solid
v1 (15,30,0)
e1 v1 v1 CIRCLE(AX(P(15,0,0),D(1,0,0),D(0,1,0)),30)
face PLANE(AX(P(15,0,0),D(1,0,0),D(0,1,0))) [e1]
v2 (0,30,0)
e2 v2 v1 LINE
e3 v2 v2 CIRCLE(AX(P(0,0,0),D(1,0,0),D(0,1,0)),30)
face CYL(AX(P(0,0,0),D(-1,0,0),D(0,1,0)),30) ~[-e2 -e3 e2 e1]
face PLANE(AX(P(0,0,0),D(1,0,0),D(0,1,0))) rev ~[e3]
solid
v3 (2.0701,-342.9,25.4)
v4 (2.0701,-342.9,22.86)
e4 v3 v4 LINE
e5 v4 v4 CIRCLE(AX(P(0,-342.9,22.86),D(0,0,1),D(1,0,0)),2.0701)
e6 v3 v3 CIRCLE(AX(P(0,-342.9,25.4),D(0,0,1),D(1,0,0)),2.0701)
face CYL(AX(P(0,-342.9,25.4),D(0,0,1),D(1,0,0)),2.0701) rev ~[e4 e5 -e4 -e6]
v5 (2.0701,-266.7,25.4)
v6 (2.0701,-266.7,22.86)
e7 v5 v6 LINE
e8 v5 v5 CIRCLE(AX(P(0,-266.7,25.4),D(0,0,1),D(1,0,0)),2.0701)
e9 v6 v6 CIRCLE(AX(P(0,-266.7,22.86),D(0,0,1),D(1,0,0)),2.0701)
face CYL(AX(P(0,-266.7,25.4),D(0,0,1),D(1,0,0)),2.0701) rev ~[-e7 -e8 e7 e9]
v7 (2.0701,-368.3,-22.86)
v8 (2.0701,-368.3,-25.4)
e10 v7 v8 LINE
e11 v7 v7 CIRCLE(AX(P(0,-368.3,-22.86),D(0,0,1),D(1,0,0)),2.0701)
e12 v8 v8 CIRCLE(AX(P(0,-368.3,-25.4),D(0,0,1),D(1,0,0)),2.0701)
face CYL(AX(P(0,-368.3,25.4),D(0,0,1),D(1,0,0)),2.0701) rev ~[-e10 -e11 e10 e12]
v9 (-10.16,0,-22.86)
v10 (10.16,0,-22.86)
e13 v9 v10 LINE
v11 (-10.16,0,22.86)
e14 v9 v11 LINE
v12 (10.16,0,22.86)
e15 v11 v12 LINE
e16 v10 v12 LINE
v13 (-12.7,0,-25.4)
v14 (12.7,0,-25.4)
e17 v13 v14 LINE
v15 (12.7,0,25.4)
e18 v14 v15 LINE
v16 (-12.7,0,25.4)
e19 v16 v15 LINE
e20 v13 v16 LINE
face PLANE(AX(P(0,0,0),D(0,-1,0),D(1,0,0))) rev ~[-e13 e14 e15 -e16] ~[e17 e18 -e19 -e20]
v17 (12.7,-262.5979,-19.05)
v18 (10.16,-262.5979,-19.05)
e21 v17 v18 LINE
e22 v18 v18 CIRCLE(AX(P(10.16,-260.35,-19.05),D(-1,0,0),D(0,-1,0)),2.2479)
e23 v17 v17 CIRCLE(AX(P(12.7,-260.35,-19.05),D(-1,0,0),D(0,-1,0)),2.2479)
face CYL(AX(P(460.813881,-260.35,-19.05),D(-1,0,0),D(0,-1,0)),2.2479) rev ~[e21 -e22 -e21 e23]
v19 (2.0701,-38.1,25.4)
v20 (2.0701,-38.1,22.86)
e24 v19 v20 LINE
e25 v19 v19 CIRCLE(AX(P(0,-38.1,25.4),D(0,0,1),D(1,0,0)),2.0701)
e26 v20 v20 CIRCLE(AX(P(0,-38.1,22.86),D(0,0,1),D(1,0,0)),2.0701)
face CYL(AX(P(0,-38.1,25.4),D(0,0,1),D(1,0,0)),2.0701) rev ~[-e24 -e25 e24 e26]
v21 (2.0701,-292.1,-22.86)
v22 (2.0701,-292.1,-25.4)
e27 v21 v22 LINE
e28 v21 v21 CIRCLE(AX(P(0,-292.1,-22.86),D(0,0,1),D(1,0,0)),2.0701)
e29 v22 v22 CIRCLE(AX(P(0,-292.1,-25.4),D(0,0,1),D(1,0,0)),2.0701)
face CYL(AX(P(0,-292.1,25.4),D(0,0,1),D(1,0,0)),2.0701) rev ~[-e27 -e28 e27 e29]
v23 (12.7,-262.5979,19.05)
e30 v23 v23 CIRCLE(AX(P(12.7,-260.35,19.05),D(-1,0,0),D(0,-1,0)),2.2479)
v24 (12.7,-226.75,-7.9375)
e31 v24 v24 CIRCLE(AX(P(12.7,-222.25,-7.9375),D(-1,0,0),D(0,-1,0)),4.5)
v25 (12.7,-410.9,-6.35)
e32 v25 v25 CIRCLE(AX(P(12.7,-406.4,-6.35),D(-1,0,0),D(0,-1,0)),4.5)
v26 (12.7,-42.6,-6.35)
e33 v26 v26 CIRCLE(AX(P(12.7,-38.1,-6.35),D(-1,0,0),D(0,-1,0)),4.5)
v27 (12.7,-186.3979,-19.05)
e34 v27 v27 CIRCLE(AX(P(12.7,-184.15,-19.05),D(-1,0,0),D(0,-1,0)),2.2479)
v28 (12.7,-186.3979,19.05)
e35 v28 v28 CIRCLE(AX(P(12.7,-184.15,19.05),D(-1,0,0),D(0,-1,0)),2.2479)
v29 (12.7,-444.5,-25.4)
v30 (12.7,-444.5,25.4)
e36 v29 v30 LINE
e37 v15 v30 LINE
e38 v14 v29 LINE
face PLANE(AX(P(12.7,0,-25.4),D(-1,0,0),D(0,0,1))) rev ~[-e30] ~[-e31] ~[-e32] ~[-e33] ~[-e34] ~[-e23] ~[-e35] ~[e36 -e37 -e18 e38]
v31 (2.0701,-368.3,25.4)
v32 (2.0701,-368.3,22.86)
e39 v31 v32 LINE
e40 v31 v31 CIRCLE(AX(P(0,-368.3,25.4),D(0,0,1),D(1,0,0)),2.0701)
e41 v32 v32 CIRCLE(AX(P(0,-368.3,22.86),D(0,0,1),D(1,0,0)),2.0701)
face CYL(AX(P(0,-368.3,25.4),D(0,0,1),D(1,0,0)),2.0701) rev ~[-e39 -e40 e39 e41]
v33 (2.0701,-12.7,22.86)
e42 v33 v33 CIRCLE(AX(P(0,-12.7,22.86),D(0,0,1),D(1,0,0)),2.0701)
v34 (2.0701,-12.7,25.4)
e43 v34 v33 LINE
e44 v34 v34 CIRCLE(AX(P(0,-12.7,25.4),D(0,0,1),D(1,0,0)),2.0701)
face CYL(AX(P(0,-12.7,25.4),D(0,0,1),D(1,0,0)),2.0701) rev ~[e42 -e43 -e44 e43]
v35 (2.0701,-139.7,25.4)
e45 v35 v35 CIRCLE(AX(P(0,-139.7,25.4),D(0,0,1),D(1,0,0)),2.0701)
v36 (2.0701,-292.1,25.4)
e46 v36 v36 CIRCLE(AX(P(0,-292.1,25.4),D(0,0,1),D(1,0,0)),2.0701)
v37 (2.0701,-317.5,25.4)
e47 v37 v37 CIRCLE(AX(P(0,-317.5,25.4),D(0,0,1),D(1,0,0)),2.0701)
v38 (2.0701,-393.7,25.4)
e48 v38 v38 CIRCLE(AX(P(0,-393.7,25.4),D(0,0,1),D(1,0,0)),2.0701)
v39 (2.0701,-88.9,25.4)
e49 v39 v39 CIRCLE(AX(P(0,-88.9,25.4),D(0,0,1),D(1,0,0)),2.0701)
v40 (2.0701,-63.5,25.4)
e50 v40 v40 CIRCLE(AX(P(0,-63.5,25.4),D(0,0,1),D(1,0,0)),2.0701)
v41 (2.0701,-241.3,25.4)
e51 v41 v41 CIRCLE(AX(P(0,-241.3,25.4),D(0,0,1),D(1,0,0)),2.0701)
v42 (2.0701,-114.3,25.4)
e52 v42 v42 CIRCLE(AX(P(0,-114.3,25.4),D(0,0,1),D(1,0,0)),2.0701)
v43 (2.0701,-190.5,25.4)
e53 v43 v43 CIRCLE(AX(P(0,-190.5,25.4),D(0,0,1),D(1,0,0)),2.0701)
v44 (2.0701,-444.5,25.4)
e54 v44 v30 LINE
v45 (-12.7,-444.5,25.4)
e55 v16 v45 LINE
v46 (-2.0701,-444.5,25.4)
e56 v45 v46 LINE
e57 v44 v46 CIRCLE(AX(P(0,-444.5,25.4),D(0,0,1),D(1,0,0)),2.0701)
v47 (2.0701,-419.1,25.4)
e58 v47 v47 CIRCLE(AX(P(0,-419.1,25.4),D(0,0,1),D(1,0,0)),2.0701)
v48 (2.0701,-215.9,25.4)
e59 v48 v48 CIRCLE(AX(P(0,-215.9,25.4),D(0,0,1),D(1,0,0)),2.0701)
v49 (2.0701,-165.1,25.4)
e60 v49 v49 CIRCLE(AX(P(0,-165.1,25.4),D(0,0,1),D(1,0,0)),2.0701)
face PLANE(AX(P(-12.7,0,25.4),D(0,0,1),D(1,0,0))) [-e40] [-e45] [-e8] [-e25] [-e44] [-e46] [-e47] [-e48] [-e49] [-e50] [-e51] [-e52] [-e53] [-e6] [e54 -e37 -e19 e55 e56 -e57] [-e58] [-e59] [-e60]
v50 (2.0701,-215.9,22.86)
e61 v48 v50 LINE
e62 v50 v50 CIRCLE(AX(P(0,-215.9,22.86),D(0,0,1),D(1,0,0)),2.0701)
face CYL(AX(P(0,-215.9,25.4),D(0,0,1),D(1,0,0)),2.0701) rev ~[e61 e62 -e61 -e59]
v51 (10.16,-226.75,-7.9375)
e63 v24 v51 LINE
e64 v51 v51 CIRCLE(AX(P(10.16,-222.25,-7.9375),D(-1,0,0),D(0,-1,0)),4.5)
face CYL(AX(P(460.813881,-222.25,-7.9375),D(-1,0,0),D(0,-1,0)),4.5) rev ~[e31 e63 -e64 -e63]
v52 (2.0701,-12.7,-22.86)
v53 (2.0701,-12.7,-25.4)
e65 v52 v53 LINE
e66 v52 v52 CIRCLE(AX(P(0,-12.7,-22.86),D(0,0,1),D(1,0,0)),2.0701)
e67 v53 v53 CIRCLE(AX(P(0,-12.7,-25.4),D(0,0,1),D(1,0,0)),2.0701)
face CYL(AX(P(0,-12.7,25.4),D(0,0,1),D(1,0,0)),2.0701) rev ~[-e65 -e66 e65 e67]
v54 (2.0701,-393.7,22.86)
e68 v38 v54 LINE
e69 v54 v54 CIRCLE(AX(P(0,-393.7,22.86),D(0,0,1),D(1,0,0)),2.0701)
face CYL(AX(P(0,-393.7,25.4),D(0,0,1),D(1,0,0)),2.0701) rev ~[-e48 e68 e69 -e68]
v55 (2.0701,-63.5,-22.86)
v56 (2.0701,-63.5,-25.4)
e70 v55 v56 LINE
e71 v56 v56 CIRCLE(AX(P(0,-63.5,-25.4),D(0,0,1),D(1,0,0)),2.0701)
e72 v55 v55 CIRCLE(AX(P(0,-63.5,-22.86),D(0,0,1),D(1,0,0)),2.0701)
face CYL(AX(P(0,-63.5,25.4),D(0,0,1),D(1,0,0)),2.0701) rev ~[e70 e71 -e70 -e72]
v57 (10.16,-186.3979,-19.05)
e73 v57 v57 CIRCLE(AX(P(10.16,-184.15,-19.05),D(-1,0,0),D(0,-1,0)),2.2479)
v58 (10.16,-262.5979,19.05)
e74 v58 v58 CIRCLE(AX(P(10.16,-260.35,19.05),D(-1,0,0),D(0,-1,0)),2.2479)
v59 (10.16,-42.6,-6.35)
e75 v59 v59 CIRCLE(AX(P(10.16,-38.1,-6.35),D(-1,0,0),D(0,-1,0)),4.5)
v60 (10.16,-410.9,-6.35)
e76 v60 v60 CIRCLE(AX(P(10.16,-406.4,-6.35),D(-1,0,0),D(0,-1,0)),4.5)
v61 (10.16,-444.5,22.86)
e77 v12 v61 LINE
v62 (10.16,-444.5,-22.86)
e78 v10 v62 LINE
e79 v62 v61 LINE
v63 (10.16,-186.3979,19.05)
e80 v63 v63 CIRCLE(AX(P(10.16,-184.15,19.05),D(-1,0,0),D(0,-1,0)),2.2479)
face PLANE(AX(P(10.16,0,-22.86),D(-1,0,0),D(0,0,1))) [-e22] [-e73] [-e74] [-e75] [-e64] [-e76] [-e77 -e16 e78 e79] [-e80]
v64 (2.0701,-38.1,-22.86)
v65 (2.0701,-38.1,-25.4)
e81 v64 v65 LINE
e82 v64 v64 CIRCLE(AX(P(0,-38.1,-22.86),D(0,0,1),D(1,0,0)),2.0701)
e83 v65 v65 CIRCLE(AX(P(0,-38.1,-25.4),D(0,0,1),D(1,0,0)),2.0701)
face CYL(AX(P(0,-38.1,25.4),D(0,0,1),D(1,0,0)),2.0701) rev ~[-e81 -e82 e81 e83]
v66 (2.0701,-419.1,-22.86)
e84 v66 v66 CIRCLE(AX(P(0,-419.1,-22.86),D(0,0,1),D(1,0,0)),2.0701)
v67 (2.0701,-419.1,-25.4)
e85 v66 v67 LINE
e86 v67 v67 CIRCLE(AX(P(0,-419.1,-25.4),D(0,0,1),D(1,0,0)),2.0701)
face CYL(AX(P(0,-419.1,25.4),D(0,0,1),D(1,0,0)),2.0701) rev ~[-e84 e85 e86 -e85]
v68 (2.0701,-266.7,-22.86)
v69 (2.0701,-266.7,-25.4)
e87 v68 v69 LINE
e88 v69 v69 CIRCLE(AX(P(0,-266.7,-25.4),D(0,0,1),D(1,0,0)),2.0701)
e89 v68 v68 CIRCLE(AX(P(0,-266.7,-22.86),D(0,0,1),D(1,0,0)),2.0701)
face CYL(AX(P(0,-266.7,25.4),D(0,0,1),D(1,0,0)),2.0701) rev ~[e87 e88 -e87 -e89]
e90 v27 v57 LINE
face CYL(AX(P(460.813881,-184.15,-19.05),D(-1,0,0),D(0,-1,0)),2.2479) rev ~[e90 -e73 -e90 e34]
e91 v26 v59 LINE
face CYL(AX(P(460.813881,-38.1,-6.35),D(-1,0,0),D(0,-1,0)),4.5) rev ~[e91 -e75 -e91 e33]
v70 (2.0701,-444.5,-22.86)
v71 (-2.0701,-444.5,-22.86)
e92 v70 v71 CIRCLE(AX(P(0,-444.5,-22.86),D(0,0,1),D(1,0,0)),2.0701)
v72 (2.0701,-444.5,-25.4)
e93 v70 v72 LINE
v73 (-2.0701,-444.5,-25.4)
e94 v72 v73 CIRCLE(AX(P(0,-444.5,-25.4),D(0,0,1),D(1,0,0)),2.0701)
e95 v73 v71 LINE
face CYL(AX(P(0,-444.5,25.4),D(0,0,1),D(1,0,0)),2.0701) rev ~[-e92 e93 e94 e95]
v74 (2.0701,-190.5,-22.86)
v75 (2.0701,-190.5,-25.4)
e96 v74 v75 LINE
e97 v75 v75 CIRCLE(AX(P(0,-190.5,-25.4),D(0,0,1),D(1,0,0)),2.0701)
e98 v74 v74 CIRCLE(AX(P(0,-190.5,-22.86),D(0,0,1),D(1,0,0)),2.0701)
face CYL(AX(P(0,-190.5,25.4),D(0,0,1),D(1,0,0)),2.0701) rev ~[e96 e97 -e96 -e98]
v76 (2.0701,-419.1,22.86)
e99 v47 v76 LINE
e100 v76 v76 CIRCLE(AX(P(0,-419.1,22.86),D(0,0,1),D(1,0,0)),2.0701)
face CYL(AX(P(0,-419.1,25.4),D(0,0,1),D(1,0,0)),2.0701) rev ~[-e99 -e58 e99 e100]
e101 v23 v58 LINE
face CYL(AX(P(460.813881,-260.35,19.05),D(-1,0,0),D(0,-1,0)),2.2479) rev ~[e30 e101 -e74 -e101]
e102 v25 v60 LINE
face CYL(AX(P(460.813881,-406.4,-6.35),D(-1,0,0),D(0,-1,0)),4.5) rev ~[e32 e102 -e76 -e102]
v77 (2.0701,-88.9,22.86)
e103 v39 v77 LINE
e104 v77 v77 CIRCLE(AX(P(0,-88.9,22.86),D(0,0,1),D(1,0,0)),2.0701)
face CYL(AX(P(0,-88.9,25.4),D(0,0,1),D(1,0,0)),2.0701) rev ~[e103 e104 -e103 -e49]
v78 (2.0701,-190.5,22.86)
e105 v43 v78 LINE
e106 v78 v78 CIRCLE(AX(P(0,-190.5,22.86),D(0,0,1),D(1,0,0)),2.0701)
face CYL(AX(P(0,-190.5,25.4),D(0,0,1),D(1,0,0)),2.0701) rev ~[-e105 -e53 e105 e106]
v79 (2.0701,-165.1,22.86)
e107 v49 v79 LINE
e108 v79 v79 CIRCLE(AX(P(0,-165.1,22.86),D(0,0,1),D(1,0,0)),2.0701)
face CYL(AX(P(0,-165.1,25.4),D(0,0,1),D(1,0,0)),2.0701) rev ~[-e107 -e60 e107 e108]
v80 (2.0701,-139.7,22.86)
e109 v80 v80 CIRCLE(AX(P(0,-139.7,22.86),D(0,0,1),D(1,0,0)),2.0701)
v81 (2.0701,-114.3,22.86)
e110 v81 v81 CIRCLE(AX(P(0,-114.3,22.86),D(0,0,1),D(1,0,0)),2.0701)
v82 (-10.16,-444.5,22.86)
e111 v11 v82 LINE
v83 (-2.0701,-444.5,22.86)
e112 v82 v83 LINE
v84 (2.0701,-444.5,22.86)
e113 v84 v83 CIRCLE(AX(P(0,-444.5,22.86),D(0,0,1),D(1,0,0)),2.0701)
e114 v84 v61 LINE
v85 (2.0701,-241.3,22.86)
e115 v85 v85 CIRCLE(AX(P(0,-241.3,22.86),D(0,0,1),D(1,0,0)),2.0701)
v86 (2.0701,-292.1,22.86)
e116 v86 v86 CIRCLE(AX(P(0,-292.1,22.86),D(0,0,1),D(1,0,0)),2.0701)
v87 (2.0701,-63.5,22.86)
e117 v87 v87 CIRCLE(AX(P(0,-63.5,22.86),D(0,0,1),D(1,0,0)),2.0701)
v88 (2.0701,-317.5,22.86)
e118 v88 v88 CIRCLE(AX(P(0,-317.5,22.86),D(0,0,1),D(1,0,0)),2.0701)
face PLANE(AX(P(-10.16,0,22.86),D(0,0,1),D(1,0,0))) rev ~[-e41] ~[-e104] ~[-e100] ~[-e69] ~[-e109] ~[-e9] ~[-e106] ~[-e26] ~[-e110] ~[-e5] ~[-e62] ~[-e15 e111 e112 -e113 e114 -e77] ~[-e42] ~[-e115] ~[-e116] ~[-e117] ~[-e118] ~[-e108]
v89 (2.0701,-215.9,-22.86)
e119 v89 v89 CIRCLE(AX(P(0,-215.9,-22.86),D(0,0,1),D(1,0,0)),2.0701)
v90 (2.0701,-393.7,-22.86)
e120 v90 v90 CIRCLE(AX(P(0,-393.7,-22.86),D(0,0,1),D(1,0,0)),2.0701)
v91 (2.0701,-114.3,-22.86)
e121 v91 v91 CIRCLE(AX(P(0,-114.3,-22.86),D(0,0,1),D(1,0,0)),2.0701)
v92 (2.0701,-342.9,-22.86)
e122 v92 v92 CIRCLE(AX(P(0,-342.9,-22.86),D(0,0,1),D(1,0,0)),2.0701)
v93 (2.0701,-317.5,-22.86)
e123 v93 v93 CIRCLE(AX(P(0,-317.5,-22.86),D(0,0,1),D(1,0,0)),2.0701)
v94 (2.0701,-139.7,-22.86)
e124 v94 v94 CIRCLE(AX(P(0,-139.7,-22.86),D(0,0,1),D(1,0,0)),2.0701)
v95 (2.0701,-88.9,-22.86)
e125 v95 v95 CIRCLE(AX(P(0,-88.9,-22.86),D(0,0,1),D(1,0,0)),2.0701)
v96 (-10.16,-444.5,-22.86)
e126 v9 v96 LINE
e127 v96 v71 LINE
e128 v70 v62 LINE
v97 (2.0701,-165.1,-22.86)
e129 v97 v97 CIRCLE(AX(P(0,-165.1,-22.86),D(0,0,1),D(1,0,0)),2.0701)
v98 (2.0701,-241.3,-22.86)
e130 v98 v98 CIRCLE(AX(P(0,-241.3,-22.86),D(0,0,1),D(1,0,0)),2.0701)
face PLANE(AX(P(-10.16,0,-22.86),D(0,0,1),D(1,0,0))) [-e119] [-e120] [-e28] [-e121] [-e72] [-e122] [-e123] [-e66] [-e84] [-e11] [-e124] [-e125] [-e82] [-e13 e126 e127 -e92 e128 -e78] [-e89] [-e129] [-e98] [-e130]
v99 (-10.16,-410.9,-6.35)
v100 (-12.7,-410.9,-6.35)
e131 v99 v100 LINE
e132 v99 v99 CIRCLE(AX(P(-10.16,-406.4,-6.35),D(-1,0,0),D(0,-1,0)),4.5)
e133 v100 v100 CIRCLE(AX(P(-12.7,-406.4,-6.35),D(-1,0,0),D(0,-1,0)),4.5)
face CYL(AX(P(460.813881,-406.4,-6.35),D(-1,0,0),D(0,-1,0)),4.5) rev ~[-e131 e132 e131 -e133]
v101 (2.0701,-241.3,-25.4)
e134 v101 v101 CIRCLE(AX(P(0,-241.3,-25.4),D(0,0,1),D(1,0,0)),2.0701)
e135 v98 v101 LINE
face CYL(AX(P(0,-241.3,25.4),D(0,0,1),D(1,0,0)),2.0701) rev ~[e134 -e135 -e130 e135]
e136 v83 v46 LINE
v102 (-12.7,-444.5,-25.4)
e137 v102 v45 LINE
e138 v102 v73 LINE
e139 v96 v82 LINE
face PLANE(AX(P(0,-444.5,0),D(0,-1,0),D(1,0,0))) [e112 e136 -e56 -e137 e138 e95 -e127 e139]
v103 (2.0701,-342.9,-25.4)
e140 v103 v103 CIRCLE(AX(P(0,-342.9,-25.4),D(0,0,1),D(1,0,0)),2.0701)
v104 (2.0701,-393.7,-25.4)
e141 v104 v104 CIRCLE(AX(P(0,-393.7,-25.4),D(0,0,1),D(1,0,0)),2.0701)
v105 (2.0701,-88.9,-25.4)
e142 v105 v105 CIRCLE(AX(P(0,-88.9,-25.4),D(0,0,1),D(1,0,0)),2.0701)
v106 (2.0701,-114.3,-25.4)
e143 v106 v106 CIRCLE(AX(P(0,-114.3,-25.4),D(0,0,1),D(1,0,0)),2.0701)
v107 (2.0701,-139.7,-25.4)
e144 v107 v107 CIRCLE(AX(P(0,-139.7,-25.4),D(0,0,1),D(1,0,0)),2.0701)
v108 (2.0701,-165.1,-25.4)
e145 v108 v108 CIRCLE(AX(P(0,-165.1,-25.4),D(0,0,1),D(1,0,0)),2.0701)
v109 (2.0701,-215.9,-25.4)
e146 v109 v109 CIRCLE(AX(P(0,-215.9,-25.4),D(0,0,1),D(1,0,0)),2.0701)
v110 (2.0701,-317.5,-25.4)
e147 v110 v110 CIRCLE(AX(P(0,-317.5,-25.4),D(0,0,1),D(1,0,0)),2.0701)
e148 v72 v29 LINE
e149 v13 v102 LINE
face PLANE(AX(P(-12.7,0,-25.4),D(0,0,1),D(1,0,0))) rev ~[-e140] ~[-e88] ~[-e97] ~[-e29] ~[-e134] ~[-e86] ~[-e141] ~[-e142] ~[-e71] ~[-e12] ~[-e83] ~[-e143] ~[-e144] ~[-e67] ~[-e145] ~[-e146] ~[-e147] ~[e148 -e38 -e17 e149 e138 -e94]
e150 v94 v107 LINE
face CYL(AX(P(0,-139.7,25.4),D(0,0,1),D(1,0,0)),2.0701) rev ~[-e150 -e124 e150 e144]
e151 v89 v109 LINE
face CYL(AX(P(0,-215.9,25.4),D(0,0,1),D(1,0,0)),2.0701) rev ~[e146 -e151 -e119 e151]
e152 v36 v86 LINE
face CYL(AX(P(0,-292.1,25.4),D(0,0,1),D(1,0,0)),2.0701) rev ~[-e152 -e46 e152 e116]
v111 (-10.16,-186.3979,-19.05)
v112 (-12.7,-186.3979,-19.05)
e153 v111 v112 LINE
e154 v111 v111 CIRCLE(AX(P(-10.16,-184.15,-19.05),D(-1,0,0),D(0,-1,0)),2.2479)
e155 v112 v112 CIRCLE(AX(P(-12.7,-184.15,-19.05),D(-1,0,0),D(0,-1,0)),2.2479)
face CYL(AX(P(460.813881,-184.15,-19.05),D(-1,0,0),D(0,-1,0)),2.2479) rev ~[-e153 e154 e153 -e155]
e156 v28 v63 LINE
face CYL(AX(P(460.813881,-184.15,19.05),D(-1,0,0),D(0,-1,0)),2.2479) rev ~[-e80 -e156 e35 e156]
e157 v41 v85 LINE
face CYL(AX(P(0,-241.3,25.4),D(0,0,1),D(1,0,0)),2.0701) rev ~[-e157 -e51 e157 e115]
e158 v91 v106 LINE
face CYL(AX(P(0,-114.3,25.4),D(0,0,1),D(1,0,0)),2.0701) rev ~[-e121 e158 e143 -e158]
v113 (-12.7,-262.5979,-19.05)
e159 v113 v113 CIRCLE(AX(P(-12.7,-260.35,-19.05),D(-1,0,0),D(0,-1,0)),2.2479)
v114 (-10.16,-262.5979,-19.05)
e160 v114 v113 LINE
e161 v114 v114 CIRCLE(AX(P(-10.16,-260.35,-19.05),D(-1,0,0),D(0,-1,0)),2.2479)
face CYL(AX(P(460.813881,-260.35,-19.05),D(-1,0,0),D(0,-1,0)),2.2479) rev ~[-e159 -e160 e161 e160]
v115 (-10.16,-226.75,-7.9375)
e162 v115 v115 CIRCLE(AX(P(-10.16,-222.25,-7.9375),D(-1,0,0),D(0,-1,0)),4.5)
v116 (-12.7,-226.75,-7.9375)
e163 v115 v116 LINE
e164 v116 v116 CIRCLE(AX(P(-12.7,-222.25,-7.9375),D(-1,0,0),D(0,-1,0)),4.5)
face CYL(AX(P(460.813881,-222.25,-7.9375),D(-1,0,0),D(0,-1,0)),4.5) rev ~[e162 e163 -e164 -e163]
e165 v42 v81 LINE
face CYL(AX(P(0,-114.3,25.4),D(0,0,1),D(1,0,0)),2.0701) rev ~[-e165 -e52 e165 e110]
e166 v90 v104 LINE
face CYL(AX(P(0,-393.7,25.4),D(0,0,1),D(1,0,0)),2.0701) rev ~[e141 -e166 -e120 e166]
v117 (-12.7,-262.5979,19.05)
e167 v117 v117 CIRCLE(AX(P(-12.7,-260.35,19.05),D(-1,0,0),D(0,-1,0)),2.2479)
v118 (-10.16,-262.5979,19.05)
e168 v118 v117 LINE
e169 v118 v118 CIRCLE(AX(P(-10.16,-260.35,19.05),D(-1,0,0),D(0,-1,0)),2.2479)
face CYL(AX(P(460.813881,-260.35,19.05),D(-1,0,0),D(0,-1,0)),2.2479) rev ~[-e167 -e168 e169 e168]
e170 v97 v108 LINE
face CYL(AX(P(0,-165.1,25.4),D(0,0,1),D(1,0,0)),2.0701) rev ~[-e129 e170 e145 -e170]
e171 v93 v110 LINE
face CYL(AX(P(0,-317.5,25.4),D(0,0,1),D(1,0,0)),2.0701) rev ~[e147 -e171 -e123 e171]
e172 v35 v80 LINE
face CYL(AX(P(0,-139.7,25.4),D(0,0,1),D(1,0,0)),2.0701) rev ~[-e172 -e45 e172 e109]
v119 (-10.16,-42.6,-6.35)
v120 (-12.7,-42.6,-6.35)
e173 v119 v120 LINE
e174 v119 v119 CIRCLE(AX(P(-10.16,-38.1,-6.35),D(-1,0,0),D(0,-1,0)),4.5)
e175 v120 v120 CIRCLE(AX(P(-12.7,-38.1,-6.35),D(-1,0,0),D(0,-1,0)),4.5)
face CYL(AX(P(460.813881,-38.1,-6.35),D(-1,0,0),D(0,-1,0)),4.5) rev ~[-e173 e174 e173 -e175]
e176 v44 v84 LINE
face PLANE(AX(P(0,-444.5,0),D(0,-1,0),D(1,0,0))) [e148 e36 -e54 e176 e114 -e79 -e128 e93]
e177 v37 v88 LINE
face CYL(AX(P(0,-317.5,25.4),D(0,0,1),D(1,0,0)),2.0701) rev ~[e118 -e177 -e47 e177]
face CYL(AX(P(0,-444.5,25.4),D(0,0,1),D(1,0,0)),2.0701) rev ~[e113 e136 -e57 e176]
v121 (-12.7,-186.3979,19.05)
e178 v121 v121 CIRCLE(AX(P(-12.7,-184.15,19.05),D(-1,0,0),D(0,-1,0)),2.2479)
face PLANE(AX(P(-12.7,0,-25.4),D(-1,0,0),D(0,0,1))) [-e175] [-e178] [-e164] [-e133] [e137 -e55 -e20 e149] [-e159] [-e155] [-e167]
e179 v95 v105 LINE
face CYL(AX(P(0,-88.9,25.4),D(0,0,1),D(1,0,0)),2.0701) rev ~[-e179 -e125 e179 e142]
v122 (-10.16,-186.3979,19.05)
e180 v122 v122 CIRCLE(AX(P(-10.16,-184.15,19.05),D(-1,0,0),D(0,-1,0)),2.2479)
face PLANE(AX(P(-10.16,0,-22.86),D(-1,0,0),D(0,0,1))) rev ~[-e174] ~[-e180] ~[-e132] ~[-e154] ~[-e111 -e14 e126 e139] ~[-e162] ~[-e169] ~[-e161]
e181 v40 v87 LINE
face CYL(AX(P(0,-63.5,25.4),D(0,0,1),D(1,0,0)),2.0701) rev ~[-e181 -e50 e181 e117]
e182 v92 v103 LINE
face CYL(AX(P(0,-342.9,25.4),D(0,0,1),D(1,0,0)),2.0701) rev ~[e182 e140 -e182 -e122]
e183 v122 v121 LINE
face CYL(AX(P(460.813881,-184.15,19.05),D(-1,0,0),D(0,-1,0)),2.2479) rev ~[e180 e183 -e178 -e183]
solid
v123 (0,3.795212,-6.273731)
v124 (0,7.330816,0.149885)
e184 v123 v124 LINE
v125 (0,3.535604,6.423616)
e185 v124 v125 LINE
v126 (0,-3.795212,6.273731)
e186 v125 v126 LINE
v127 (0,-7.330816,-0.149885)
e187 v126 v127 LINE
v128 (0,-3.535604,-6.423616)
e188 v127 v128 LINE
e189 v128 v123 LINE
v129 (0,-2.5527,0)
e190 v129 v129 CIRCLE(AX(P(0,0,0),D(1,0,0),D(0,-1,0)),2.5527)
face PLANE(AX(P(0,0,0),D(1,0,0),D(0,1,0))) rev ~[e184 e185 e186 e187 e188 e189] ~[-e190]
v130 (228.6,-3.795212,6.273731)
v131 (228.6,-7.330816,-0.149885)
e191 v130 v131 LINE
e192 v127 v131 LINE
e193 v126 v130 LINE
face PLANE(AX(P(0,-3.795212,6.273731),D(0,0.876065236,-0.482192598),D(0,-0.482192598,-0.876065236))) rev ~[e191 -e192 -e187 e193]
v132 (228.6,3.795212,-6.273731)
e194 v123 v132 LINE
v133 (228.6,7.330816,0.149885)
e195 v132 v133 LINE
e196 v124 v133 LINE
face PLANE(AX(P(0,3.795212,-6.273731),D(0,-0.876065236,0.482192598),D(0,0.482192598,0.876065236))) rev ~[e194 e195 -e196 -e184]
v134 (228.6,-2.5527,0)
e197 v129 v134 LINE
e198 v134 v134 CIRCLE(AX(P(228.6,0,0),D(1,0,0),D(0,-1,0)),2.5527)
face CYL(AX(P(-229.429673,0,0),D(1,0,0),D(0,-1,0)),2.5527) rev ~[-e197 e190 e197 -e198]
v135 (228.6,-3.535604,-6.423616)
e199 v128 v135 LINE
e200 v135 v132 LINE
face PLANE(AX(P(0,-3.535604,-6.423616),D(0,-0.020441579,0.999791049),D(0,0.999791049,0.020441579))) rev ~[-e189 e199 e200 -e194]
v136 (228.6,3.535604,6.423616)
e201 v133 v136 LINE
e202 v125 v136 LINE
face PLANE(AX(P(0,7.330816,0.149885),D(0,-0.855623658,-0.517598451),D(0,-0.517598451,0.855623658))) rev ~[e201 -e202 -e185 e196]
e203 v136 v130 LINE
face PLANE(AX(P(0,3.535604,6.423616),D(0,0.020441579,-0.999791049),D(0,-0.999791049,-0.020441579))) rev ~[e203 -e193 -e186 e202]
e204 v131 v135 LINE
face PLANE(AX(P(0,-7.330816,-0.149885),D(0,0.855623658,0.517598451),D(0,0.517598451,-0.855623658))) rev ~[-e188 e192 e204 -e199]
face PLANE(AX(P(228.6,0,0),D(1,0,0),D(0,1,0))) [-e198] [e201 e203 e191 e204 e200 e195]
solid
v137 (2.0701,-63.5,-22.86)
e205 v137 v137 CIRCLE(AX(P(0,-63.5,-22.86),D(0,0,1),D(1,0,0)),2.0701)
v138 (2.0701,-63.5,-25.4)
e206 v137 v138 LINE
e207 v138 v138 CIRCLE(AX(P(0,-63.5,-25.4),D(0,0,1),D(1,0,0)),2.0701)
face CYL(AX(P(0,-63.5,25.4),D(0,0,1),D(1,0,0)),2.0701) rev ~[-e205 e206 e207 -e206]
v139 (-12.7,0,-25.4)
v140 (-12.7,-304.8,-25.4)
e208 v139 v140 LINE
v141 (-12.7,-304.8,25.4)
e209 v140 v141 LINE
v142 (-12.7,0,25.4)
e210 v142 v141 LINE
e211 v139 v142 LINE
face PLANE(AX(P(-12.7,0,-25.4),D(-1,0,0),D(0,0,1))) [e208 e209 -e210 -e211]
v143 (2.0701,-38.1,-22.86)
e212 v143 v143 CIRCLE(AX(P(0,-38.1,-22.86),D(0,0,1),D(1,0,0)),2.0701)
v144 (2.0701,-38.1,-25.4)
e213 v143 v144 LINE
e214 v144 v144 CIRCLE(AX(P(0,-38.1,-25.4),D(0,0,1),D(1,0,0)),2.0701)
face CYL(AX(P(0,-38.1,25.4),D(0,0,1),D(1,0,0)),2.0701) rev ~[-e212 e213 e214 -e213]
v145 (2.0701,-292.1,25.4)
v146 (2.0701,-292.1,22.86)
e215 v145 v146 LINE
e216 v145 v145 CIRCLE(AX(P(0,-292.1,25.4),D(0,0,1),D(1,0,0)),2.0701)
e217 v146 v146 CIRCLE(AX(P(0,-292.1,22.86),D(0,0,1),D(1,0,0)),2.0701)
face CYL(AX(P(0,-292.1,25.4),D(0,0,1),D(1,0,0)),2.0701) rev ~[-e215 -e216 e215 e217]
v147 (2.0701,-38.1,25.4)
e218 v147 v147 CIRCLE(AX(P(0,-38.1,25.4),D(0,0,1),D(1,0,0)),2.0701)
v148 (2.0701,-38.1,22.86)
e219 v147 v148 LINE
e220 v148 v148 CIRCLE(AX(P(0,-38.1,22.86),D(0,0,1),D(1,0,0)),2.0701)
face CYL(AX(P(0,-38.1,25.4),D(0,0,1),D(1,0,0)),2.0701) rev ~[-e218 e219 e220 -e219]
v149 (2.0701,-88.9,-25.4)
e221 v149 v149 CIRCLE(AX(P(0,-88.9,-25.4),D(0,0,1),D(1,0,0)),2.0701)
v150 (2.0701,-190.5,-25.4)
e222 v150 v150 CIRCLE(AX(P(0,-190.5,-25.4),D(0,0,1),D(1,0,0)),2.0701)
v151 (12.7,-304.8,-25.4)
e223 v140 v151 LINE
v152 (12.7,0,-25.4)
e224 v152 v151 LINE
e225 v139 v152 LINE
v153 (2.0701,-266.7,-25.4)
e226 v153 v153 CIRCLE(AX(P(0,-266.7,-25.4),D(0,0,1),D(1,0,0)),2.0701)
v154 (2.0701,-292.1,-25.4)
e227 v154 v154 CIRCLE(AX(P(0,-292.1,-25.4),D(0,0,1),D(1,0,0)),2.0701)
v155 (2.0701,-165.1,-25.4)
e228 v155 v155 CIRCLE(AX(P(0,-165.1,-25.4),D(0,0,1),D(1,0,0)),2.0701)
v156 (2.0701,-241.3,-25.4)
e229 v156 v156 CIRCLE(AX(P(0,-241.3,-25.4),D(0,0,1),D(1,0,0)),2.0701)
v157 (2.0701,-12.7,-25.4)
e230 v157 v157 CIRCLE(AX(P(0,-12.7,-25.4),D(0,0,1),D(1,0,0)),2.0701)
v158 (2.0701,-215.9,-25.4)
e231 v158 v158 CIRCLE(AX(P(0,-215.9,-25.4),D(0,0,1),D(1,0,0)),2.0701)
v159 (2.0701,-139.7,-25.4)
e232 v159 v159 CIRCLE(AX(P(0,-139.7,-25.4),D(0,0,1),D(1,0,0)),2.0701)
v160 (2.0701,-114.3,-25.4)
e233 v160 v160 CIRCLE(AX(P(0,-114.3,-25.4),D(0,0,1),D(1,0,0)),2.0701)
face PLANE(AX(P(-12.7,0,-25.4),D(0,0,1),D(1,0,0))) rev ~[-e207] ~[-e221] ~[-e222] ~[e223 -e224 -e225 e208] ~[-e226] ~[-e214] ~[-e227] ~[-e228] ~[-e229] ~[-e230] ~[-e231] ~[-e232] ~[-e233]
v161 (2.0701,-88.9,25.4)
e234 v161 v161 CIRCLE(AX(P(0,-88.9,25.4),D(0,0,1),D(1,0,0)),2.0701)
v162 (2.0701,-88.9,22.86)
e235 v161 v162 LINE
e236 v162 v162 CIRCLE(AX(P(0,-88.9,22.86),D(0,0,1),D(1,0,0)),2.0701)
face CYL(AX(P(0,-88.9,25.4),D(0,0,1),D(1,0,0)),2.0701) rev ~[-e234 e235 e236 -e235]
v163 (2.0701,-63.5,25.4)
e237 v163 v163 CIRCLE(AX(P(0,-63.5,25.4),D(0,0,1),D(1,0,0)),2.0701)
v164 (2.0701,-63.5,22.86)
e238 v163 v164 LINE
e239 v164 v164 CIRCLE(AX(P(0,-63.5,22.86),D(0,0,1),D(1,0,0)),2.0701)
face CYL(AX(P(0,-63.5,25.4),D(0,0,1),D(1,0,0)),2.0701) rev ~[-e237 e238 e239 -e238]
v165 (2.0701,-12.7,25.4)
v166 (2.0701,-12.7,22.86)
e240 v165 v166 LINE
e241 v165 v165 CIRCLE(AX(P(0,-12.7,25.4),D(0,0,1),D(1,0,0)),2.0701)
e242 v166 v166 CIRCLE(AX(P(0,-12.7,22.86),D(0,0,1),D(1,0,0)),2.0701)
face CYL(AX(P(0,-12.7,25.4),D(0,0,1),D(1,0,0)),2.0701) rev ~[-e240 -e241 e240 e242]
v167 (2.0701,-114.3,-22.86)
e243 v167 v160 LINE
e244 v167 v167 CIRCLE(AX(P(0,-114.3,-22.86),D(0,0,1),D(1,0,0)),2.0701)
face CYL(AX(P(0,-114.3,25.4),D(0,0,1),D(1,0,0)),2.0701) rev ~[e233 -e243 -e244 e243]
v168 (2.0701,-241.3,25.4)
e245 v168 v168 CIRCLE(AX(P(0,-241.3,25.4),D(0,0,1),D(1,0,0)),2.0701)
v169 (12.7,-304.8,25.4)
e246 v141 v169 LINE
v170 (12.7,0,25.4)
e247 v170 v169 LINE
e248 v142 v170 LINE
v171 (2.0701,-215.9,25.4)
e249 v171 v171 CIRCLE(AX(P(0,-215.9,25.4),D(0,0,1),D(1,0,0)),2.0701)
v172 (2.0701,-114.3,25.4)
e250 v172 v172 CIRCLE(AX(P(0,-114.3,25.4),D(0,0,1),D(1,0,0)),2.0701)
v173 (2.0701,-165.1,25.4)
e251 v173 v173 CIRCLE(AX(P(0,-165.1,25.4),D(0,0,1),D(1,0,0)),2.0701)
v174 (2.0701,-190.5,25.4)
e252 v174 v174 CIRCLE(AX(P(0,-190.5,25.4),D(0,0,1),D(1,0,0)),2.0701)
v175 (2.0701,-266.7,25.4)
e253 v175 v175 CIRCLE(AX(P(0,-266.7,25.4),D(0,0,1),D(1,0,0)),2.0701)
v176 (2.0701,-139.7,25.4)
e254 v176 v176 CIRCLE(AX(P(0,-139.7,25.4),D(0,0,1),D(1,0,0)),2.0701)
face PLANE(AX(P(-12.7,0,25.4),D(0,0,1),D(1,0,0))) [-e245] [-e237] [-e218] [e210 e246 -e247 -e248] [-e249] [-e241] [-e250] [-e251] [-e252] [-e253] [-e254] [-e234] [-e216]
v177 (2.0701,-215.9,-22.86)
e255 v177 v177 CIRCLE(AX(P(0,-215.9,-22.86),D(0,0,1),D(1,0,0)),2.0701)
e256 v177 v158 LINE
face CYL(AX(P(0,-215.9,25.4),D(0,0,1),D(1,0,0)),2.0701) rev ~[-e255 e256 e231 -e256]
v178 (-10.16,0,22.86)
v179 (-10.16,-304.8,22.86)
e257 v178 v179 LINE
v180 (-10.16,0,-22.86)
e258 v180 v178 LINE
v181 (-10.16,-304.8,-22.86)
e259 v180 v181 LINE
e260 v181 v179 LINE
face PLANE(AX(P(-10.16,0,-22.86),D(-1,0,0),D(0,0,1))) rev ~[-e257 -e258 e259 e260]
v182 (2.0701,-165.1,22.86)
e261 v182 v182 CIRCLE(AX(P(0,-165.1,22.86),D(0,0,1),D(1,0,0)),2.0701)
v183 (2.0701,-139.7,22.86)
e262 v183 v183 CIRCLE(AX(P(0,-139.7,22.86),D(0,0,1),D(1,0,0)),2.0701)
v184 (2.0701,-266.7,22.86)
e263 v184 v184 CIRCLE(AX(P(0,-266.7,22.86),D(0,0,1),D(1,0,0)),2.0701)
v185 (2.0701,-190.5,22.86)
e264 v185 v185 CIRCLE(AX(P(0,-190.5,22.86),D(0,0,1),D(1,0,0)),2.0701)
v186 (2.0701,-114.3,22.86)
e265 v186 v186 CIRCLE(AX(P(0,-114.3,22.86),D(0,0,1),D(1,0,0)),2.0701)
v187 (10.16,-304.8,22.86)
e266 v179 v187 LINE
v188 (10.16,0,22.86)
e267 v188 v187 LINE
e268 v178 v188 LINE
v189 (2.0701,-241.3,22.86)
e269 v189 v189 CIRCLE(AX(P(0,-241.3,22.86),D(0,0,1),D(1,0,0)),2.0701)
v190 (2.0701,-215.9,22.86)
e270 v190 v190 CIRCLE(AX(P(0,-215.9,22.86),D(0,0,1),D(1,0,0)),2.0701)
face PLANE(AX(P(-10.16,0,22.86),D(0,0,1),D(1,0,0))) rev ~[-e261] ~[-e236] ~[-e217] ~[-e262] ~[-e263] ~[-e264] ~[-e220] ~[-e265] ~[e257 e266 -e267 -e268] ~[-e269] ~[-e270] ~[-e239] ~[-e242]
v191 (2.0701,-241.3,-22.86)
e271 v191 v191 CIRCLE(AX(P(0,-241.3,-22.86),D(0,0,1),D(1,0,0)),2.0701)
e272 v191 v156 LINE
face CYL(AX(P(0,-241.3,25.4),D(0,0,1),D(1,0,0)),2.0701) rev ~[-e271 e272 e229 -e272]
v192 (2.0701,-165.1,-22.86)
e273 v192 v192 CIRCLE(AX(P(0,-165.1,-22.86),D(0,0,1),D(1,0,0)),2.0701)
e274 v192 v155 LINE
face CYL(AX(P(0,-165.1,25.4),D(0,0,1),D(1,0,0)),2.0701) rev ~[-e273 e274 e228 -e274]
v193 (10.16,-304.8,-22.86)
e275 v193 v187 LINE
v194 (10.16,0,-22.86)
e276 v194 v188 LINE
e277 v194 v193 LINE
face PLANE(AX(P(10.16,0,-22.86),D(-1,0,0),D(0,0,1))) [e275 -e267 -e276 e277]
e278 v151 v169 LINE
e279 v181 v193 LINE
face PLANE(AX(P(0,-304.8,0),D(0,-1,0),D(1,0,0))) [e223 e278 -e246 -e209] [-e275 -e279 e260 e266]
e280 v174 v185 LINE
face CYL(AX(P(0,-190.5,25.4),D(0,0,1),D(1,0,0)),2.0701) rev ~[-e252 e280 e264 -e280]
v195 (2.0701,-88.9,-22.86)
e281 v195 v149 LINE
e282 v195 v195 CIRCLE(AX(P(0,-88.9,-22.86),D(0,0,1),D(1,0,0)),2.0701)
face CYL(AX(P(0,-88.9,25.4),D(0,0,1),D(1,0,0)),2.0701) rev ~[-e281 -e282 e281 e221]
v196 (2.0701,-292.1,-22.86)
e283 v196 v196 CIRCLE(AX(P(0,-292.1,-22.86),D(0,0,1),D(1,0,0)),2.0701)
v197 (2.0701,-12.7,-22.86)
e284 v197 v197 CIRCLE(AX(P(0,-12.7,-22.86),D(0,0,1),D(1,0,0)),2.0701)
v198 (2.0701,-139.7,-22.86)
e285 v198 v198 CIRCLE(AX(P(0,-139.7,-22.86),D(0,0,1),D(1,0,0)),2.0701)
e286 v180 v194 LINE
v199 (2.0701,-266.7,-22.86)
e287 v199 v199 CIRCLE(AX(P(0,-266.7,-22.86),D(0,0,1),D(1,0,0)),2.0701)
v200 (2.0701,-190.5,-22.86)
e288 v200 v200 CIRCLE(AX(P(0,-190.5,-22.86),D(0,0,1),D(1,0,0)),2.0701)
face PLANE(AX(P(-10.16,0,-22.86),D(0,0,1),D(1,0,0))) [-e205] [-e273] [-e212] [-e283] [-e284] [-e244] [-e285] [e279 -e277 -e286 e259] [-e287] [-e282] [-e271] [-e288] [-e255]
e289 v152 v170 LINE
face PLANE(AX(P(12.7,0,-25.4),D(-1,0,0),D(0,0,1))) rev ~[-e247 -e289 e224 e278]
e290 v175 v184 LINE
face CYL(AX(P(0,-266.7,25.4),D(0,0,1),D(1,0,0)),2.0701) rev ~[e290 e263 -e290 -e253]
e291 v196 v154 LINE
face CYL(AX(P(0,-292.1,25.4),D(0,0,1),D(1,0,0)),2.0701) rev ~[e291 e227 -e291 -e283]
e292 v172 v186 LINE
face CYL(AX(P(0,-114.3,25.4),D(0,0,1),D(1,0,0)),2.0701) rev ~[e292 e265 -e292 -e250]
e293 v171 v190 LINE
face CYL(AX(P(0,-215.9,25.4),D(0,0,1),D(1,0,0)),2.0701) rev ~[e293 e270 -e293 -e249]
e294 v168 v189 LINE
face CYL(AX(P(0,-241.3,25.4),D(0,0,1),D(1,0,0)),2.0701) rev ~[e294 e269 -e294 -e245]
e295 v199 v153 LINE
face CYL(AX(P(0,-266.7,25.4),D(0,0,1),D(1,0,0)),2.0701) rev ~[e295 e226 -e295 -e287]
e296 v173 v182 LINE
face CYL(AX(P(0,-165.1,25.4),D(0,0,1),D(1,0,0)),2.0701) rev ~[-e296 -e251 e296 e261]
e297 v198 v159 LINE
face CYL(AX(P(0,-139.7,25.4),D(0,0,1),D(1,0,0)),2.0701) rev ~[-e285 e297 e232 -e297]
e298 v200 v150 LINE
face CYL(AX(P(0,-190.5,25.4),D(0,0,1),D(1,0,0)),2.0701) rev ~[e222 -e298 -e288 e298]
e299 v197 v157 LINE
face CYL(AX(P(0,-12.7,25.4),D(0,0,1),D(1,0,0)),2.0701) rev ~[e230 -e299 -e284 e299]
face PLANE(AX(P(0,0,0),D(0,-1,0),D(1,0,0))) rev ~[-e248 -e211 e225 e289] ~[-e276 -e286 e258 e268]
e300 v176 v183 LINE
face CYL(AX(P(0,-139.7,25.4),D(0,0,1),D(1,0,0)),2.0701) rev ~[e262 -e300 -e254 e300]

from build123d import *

# Parameters (mm, degrees)
F0_W      = 25.4
F0_H      = 50.8
F0_W_2    = 20.32
F0_H_2    = 45.72
F1_DEPTH  = 444.5
F4_D      = 9
F5_R      = 30
F6_DEPTH  = 15
F7_DEPTH  = 304.8
F2_R      = 2.0701
F8_DEPTH  = 55.401
F10_DEPTH = 228.6
F11_D     = 5.1054
F12_D     = 4.4958


with BuildPart() as f1:
    # F0 (on Front) → F1 (new body)
    with BuildSketch(Plane.XZ):
        Rectangle(F0_W, F0_H)
        Rectangle(F0_W_2, F0_H_2, mode=Mode.SUBTRACT)
    extrude(amount=F1_DEPTH)

    # F4 (through all)
    with Locations(Plane.YZ.offset(12.7)):
        with Locations((-406.4, -6.35), (-222.25, -7.9375), (-38.1, -6.35)):
            Hole(F4_D / 2)


with BuildPart() as f6:
    # F5 (on Right) → F6 (new body)
    with BuildSketch(Plane.YZ):
        Circle(F5_R)
    extrude(amount=F6_DEPTH)


with BuildPart() as f7:
    # F0 (on Front) → F7 (new body)
    with BuildSketch(Plane.XZ):
        Rectangle(F0_W, F0_H)
        Rectangle(F0_W_2, F0_H_2, mode=Mode.SUBTRACT)
    extrude(amount=F7_DEPTH)


with BuildPart() as f8_tool:
    # F2 (on face) → F8 (new body, through all)
    with BuildSketch(Plane.XY.offset(25.4)):
        with Locations((0, -12.7)):
            Circle(F2_R)
        with Locations((0, -38.1)):
            Circle(F2_R)
        with Locations((0, -63.5)):
            Circle(F2_R)
        with Locations((0, -88.9)):
            Circle(F2_R)
        with Locations((0, -114.3)):
            Circle(F2_R)
        with Locations((0, -139.7)):
            Circle(F2_R)
        with Locations((0, -165.1)):
            Circle(F2_R)
        with Locations((0, -190.5)):
            Circle(F2_R)
        with Locations((0, -215.9)):
            Circle(F2_R)
        with Locations((0, -241.3)):
            Circle(F2_R)
        with Locations((0, -266.7)):
            Circle(F2_R)
        with Locations((0, -292.1)):
            Circle(F2_R)
        with Locations((0, -317.5)):
            Circle(F2_R)
        with Locations((0, -342.9)):
            Circle(F2_R)
        with Locations((0, -368.3)):
            Circle(F2_R)
        with Locations((0, -393.7)):
            Circle(F2_R)
        with Locations((0, -419.1)):
            Circle(F2_R)
        with Locations((0, -444.5)):
            Circle(F2_R)
    extrude(amount=-F8_DEPTH)


with BuildPart() as f1_1:
    add(f1.part)

    # F8: cut by f8_tool
    add(f8_tool.part, mode=Mode.SUBTRACT)

    # F12 (through all)
    with Locations(Plane.YZ.offset(12.7)):
        with Locations((-260.35, 19.05), (-184.15, 19.05), (-184.15, -19.05), (-260.35, -19.05)):
            Hole(F12_D / 2)


with BuildPart() as f7_1:
    add(f7.part)

    # F8: cut by f8_tool
    add(f8_tool.part, mode=Mode.SUBTRACT)


with BuildPart() as f10:
    # F9 (on Right) → F10 (new body)
    with BuildSketch(Plane.YZ):
        Polygon((3.7952121831, -6.2737307735), (7.3308163179, 0.1498847766), (3.5356041348, 6.4236155501), (-3.7952121831, 6.2737307735), (-7.3308163179, -0.1498847766), (-3.5356041348, -6.4236155501), align=None)
    extrude(amount=F10_DEPTH)

    # F11 (through all)
    with Locations(Plane(origin=(0, 0, 0), x_dir=(0, 1, 0), z_dir=(-1, 0, 0))):
        with Locations((0, 0)):
            Hole(F11_D / 2)


solid = Compound([f6.part, f1_1.part, f7_1.part, f10.part])
